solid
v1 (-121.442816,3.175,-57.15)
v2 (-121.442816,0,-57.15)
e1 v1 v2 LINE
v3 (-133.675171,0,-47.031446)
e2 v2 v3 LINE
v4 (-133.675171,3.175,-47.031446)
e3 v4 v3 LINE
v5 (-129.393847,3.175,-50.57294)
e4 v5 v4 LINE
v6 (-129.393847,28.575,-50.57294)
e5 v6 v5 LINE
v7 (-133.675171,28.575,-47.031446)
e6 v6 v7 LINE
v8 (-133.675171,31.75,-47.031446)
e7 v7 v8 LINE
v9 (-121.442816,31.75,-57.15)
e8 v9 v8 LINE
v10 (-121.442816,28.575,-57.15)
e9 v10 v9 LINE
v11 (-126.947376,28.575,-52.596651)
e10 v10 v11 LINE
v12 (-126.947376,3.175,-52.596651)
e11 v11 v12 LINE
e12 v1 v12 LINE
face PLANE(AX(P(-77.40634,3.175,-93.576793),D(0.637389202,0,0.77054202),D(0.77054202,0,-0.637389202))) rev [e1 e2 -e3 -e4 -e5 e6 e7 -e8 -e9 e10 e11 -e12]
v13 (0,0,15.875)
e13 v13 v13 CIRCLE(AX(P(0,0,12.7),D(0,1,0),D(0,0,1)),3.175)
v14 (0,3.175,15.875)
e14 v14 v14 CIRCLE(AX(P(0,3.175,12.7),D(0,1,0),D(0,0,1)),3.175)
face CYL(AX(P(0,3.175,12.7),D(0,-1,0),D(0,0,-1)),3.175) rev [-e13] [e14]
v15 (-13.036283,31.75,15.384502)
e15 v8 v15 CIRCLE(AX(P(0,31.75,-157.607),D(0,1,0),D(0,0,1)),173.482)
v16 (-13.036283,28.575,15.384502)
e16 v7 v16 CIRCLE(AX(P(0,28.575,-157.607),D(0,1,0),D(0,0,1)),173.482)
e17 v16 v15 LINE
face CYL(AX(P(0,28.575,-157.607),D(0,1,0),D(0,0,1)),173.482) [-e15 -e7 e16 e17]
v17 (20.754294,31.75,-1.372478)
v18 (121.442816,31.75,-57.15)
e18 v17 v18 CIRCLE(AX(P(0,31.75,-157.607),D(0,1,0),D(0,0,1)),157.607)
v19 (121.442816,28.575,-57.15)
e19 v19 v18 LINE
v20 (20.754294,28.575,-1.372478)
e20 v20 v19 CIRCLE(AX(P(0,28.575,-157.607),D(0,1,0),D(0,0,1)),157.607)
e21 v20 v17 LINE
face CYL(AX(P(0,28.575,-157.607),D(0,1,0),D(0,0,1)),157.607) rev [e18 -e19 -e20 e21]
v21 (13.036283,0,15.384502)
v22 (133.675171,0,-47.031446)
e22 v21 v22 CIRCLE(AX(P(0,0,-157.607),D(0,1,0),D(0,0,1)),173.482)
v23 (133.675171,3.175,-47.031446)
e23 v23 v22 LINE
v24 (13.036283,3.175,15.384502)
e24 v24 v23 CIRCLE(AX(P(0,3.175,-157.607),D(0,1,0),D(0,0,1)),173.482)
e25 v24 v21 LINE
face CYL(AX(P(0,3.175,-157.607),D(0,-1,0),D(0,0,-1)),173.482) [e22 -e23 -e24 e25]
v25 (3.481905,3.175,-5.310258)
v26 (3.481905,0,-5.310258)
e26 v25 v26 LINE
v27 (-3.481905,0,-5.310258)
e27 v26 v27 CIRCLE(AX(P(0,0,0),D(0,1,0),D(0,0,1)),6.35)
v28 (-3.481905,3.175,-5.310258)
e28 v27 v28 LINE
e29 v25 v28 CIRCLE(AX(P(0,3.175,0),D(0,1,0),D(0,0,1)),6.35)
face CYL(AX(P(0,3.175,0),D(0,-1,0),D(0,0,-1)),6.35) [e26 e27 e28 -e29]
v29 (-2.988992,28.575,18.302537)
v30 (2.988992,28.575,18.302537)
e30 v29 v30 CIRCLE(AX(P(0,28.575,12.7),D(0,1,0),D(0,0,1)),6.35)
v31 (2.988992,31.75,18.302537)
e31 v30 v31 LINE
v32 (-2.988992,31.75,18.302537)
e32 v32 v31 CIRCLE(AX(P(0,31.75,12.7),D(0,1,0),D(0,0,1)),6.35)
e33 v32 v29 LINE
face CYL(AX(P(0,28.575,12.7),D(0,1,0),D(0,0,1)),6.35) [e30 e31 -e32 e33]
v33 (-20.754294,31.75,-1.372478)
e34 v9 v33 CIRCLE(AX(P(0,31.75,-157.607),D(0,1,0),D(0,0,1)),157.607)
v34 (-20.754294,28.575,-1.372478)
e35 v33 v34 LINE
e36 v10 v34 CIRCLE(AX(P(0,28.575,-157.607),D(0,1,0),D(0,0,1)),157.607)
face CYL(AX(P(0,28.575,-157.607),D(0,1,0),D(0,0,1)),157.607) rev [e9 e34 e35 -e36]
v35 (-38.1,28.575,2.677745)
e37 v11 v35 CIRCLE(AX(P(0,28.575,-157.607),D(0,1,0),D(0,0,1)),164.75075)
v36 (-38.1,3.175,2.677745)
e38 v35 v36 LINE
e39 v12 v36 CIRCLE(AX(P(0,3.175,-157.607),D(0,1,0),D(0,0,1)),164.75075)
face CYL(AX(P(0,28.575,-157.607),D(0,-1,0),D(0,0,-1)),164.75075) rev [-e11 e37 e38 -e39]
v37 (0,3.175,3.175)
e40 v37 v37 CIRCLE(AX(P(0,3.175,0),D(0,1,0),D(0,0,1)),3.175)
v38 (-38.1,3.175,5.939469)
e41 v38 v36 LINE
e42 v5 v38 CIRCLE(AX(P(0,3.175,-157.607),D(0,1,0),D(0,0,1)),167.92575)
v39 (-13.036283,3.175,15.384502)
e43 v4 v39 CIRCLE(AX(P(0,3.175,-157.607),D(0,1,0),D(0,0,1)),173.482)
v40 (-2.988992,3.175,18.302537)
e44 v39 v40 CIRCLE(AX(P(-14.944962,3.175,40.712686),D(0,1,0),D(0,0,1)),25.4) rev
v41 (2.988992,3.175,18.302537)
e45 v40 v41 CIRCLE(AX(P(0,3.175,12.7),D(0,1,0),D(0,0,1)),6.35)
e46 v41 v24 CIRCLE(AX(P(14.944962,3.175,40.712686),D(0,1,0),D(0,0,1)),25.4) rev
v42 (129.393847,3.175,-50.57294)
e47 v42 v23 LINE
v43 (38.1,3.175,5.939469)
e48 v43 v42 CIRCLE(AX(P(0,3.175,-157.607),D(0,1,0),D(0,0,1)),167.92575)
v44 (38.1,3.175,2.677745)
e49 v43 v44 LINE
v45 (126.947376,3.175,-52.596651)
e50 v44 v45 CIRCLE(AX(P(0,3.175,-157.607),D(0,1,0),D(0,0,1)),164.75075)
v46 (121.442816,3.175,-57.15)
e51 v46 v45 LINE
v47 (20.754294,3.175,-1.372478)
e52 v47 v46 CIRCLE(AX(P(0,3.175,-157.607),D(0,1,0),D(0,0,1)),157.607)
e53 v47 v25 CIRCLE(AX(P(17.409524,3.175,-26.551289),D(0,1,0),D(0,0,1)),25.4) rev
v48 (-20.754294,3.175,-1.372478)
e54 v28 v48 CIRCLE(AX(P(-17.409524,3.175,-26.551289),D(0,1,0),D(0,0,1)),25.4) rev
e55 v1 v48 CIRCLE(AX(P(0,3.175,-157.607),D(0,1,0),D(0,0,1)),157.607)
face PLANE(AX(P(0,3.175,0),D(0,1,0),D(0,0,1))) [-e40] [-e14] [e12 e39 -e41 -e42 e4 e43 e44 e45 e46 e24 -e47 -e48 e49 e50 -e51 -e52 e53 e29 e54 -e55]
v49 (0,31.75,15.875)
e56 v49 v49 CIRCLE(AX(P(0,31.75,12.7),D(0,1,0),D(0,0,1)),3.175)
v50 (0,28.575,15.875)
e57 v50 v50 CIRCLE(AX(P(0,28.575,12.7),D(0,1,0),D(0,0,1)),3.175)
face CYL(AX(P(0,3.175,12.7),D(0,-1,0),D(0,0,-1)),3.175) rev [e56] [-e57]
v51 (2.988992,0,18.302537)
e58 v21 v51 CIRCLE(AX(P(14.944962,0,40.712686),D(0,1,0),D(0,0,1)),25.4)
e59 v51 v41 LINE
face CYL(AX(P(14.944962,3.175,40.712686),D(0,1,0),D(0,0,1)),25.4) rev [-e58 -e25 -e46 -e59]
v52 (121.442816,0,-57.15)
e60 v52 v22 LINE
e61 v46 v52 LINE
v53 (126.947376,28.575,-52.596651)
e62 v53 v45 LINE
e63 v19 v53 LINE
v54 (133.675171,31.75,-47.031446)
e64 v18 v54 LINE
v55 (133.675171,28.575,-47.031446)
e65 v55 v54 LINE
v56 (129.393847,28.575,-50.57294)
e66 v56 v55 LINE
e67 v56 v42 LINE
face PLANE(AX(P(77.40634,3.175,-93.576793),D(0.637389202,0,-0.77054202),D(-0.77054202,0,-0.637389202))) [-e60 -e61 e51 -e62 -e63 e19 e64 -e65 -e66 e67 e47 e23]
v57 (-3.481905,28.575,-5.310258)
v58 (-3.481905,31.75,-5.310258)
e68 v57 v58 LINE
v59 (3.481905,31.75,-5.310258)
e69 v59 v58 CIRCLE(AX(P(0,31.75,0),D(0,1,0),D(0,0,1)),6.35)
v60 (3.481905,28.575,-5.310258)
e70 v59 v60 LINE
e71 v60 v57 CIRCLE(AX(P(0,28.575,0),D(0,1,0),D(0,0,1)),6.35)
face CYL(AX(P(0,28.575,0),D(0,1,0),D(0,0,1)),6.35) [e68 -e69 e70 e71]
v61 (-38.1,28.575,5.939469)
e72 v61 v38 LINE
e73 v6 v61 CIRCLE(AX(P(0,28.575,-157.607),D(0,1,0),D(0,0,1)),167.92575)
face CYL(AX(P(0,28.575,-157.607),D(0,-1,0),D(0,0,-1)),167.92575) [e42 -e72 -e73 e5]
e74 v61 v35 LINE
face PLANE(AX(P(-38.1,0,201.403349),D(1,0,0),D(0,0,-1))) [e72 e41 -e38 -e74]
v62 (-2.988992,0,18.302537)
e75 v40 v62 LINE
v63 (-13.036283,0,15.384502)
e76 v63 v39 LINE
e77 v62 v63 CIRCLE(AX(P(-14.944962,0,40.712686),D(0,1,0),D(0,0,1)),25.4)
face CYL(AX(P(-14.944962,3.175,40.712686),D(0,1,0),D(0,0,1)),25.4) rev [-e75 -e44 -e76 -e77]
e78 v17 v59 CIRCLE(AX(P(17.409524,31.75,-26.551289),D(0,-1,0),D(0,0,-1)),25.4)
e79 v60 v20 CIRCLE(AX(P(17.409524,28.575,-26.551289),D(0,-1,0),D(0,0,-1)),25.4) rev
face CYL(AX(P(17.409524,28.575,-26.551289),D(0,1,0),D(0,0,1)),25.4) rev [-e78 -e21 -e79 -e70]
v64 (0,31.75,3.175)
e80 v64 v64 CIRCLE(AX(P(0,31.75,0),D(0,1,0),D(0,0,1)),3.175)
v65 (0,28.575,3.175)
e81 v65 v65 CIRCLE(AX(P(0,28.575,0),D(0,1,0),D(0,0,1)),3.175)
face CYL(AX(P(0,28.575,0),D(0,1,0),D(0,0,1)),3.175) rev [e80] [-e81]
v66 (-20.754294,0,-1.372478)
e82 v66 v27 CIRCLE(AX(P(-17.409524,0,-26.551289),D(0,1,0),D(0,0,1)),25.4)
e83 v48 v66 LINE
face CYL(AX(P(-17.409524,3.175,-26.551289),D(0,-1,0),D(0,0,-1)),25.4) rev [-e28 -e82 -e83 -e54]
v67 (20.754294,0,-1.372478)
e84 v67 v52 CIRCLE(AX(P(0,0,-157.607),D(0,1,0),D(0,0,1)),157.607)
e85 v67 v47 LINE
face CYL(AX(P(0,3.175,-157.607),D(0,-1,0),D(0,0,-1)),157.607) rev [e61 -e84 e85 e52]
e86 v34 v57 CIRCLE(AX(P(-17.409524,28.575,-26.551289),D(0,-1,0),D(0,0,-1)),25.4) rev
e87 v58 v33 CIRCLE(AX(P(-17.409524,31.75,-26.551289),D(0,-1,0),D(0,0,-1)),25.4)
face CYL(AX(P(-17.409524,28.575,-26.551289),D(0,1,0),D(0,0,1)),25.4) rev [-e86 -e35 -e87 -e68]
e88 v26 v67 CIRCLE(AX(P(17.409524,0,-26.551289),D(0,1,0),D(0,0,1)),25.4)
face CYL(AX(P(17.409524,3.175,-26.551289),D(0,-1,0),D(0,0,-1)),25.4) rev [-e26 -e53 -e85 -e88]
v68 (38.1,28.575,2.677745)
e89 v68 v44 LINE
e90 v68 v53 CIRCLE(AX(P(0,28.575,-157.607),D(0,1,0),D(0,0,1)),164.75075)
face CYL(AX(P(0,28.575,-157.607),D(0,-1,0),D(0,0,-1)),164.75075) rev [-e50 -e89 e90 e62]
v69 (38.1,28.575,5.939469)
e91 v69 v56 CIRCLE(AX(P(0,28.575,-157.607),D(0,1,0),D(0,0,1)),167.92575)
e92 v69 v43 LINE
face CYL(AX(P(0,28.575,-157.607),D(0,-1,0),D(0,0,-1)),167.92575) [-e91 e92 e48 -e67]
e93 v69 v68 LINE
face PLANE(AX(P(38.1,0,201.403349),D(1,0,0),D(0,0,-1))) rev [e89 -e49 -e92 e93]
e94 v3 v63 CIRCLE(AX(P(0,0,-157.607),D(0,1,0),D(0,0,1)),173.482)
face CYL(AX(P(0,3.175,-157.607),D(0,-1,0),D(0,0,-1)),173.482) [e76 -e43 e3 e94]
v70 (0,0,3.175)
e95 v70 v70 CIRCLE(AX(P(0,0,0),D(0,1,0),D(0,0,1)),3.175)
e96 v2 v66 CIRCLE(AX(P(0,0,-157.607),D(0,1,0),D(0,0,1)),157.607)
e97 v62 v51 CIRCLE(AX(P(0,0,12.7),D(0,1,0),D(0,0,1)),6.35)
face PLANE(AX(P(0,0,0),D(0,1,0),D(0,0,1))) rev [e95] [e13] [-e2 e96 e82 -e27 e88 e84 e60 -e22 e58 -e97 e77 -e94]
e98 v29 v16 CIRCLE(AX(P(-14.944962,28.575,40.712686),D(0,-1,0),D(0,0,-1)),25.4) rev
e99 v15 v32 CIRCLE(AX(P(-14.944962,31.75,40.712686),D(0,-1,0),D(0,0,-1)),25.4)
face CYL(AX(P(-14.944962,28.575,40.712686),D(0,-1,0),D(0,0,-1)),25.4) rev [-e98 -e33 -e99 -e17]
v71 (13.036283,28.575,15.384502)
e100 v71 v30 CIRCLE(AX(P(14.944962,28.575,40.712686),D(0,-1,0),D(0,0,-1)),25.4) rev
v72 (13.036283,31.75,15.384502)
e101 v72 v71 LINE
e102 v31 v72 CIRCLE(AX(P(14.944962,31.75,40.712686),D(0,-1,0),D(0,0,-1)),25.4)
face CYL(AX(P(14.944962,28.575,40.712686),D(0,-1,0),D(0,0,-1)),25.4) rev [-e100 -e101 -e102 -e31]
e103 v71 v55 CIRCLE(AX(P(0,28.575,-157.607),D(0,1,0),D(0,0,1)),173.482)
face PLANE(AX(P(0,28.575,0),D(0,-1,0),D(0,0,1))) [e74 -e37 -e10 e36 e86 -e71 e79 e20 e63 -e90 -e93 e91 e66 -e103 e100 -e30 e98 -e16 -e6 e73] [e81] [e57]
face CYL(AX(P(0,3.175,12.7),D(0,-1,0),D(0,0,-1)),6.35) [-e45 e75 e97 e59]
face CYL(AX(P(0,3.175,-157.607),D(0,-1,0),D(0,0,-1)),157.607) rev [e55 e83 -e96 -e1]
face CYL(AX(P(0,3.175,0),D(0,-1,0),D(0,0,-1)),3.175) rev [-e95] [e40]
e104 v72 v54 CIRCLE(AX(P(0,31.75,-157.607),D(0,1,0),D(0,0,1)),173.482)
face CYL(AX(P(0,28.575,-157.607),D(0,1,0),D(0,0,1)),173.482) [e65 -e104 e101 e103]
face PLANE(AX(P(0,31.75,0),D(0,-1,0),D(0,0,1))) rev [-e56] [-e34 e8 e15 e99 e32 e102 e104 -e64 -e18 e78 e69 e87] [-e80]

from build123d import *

# Parameters (mm, degrees)
SKETCH1_R           = 3.175
BOSS_EXTRUDE1_DEPTH = 3.175
BOSS_EXTRUDE2_DEPTH = 25.4
FILLET1_R           = 25.4
SKETCH4_W           = 38.1
SKETCH4_H           = 25.4
CUT_EXTRUDE1_DEPTH  = 254


# Read off the part's stored shape, not the designer's step: Boss-Extrude2
with BuildPart() as part:
    # Sketch1 → Boss-Extrude1 (new body)
    with BuildSketch(Plane(origin=(0, 0, 0), x_dir=(1, 0, 0), z_dir=(0, 1, 0))):
        with BuildLine():
            ThreePointArc((-133.675170743, 47.031446414), (-76.370132102, 1.839200867), (-5.549575239, -15.786213647))
            ThreePointArc((-5.549575239, -15.786213647), (0, -19.05), (5.549575239, -15.786213647))
            ThreePointArc((5.549575239, -15.786213647), (76.370132102, 1.839200867), (133.675170743, 47.031446414))
            Line((133.675170743, 47.031446414), (121.442816173, 57.15))
            ThreePointArc((121.442816173, 57.15), (69.968192782, 16.382290944), (6.348711382, 0.127921031))
            ThreePointArc((6.348711382, 0.127921031), (0, 6.35), (-6.348711382, 0.127921031))
            ThreePointArc((-6.348711382, 0.127921031), (-69.968192782, 16.382290944), (-121.442816173, 57.15))
            Line((-121.442816173, 57.15), (-133.675170743, 47.031446414))
        make_face()
        with Locations(Location((0, -12.7, 0), (0, 0, 270))):
            Circle(SKETCH1_R, mode=Mode.SUBTRACT)
        with Locations(Location((0, 0, 0), (0, 0, 270))):
            Circle(SKETCH1_R, mode=Mode.SUBTRACT)
    boss_extrude1 = extrude(amount=BOSS_EXTRUDE1_DEPTH)

    # Boss-Extrude2 outline → Boss-Extrude2 (add)
    with BuildSketch(Plane(origin=(0, 3.175, 0), x_dir=(1, 0, 0), z_dir=(0, 1, 0))):
        with BuildLine():
            ThreePointArc((2.08529156, -10.30580199), (72.444780746, 6.111748406), (129.393846644, 50.572940169))
            Line((129.393846644, 50.572940169), (126.947375729, 52.596650886))
            ThreePointArc((126.947375729, 52.596650886), (0, -7.14375), (-126.947375729, 52.596650886))
            Line((-126.947375729, 52.596650886), (-129.393846644, 50.572940169))
            ThreePointArc((-129.393846644, 50.572940169), (-72.444780746, 6.111748406), (-2.08529156, -10.30580199))
            ThreePointArc((-2.08529156, -10.30580199), (0, -9.525), (2.08529156, -10.30580199))
        make_face()
    extrude(amount=BOSS_EXTRUDE2_DEPTH)

    # Mirror1: Boss-Extrude1 across plane
    add(boss_extrude1.mirror(Plane(origin=(0, 15.875, 0), x_dir=(0, 0, 1), z_dir=(0, -1, 0))))

    # Fillet1
    fillet1_edges = [part.edges().sort_by_distance(p)[0] for p in [
        (-5.549575239, 1.5875, 15.786213647),
        (-6.348711382, 1.5875, -0.127921031),
        (6.348711382, 1.5875, -0.127921031),
        (5.549575239, 1.5875, 15.786213647),
        (5.549575239, 30.1625, 15.786213647),
        (-5.549575239, 30.1625, 15.786213647),
        (-6.348711382, 30.1625, -0.127921031),
        (6.348711382, 30.1625, -0.127921031),
    ]]
    fillet(fillet1_edges, radius=FILLET1_R)

    # Sketch4 → Cut-Extrude1 (cut)
    with BuildSketch(Plane.XY.offset(-52.596650886)):
        with Locations((-19.05, 15.875)):
            Rectangle(SKETCH4_W, SKETCH4_H)
        with Locations((19.05, 15.875)):
            Rectangle(SKETCH4_W, SKETCH4_H)
    extrude(amount=CUT_EXTRUDE1_DEPTH, mode=Mode.SUBTRACT)


solid = part.part
